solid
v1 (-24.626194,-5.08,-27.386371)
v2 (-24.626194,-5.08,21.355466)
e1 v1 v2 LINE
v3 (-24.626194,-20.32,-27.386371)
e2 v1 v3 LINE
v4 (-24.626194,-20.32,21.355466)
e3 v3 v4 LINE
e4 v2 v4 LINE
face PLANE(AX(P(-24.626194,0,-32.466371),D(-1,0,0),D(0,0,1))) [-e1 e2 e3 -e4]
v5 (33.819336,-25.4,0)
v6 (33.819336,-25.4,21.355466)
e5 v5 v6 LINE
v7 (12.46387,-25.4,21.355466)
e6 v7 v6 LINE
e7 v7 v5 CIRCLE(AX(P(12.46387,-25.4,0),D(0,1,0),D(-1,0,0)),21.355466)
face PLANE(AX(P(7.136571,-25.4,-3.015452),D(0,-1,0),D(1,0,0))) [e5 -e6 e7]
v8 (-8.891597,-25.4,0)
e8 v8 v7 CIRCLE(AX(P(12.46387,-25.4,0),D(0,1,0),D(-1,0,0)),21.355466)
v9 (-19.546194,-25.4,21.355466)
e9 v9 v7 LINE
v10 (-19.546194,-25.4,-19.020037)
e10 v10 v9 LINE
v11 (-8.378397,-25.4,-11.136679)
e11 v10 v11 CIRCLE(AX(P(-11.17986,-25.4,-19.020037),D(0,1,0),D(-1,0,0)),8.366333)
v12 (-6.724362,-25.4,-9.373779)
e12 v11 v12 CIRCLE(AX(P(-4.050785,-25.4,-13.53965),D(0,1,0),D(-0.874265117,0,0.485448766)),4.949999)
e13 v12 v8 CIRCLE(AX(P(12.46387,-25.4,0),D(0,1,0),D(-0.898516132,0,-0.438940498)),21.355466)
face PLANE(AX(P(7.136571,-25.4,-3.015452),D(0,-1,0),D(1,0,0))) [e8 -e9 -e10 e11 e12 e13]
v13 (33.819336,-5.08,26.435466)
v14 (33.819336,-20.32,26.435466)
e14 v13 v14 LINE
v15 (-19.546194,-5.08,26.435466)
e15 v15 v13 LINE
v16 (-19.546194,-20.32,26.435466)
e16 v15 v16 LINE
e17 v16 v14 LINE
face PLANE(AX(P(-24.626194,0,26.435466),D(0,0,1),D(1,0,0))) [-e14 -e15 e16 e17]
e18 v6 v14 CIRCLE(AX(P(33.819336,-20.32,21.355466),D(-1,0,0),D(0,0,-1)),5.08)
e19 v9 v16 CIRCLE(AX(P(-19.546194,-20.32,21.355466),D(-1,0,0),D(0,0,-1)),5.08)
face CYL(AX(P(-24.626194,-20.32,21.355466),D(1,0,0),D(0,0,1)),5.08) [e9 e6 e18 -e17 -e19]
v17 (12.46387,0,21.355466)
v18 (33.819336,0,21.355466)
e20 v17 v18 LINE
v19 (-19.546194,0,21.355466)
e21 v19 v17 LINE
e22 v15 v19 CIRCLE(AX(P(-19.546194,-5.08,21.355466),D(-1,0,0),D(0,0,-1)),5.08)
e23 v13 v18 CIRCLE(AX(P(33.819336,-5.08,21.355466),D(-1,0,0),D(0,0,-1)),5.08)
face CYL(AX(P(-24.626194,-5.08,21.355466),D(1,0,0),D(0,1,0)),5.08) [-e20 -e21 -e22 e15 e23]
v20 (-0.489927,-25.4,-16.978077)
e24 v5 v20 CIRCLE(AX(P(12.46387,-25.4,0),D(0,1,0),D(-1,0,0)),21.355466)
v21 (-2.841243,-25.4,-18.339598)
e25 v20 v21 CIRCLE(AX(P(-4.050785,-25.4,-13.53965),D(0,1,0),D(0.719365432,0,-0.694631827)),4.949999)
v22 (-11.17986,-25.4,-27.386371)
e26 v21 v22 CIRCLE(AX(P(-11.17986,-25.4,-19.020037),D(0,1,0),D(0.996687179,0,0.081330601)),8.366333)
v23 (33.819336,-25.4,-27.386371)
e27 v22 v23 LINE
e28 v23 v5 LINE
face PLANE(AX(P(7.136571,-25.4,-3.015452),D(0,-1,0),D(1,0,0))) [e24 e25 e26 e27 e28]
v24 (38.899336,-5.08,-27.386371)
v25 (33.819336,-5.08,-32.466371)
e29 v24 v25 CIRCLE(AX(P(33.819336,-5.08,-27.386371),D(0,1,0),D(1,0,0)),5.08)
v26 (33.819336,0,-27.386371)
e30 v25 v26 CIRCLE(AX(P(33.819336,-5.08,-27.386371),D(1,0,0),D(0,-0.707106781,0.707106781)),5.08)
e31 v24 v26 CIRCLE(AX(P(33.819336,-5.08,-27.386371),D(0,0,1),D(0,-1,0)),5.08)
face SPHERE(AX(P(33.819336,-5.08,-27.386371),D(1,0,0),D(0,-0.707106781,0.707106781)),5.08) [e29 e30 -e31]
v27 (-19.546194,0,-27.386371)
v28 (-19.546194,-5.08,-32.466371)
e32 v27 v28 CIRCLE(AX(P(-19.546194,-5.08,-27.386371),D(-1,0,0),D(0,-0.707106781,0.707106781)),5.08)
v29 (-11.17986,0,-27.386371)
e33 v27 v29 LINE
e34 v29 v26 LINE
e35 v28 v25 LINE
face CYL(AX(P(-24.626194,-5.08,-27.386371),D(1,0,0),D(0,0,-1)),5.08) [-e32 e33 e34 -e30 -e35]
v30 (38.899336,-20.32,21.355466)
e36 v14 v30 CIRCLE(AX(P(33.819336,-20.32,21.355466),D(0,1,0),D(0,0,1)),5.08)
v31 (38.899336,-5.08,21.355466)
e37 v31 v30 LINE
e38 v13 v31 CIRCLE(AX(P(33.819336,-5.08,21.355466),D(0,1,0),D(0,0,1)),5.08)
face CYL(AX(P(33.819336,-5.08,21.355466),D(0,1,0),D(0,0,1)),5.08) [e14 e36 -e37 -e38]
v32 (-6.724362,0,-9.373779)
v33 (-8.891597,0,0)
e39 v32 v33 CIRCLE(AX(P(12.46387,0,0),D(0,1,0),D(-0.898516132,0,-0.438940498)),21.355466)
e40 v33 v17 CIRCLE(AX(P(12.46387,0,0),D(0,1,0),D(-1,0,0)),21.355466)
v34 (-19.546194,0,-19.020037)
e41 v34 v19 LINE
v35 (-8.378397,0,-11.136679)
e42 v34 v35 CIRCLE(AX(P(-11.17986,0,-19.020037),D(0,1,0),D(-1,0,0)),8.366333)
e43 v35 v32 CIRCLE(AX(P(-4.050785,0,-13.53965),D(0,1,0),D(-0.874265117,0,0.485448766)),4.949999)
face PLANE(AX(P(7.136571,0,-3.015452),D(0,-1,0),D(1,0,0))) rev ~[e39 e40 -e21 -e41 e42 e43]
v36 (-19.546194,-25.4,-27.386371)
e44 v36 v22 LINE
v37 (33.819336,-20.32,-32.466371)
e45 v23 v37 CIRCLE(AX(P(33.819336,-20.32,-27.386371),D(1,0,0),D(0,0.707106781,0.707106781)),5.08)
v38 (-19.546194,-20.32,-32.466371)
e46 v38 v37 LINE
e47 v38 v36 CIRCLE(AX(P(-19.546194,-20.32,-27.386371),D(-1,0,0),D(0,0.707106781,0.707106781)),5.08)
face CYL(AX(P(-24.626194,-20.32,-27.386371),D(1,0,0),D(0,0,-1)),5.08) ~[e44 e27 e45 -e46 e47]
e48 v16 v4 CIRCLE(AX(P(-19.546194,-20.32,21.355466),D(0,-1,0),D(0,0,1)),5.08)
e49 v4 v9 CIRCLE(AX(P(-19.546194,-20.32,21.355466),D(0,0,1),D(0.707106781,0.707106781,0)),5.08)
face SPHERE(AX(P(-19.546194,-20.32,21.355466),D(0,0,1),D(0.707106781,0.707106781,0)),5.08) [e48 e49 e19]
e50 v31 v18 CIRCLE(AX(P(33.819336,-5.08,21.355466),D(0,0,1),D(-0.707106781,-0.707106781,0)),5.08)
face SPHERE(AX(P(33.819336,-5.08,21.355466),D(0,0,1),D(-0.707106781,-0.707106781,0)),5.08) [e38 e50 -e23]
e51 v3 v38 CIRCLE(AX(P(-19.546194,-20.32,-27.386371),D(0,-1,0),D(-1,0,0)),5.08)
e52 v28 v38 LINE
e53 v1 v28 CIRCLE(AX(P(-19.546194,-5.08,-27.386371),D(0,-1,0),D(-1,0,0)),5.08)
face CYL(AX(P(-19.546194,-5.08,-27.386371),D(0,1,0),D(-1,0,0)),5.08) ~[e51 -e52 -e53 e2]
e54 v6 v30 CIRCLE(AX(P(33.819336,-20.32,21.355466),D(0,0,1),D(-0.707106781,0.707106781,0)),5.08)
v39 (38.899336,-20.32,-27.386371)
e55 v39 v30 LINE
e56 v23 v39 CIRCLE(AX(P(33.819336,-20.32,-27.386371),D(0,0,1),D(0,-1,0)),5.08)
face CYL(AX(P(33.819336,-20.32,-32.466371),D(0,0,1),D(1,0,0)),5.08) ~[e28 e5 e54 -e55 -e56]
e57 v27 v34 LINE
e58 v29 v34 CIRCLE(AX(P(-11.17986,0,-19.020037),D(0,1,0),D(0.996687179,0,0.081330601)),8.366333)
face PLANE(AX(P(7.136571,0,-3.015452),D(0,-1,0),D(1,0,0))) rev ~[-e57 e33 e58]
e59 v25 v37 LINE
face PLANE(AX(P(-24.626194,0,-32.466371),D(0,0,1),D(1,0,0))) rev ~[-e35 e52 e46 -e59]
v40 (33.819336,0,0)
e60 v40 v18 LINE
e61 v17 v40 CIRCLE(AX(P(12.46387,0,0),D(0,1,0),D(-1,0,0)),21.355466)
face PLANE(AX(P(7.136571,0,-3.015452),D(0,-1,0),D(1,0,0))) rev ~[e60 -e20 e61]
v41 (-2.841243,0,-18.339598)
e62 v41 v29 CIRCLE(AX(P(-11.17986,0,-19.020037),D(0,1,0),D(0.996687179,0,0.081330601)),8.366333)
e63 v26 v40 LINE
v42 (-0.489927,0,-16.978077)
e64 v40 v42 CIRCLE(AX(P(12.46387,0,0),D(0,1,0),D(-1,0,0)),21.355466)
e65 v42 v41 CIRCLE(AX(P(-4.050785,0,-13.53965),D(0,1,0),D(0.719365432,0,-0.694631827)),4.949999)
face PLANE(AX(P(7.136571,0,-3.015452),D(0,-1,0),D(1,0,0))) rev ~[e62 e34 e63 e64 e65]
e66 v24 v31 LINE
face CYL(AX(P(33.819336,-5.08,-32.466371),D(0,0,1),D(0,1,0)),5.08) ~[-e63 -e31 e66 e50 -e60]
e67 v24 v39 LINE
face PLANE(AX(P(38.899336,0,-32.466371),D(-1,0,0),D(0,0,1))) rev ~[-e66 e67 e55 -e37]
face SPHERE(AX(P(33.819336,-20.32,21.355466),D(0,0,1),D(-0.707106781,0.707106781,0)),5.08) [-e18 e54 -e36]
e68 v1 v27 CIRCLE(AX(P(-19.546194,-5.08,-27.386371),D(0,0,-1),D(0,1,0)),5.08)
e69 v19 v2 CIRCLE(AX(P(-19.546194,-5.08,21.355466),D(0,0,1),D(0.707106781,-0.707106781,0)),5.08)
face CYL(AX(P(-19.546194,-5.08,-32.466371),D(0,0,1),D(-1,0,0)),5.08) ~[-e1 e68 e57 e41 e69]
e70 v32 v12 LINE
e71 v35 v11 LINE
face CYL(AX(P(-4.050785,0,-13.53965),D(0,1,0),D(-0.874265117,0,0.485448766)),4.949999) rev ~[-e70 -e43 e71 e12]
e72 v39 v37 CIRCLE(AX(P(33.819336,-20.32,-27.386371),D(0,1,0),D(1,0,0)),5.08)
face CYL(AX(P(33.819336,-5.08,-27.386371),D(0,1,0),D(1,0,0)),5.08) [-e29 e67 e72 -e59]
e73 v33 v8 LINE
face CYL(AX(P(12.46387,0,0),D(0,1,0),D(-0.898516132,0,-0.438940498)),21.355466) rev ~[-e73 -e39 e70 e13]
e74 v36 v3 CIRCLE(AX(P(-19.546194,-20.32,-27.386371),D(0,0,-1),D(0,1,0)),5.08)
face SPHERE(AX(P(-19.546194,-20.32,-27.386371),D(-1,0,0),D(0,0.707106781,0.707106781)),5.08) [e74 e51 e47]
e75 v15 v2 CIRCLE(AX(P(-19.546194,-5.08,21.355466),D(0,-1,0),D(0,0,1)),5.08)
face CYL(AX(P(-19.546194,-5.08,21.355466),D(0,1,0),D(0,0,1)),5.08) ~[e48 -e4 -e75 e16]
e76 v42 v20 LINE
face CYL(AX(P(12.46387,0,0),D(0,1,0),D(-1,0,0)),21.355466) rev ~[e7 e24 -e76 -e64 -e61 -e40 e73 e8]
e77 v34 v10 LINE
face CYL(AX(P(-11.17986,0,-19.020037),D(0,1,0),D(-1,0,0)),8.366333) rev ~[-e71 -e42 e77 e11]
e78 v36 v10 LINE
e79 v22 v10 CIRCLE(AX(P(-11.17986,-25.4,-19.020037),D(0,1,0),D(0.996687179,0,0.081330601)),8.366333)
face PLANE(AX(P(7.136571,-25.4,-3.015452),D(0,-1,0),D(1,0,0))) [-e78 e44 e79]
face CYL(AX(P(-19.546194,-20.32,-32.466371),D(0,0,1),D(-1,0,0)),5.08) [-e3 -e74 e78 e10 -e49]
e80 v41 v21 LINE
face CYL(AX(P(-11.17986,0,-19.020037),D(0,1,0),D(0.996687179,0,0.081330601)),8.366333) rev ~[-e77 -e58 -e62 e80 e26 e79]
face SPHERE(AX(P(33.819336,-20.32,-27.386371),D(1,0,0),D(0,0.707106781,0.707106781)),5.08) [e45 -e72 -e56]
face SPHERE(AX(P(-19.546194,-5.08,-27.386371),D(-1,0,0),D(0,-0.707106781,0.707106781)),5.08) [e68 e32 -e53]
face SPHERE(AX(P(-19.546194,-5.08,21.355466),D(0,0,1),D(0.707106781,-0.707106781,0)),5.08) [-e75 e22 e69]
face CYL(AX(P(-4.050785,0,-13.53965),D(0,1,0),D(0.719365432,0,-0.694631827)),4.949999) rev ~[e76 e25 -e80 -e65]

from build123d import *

# Parameters (mm, degrees)
F0_W         = 63.5255295783
F0_H         = 58.9018370956
F1_DEPTH     = 25.4
F2_R         = 5.08
F3_R         = 5.08
F4_T1_DEPTH  = 15.24
F4_S5_W      = 5.08
F4_S5_H      = 5.08
F4_T6_DEPTH  = 5.08
F4_S11_W     = 5.08
F4_S11_H     = 5.08
F4_T12_DEPTH = 5.08
F4_S17_W     = 5.08
F4_S17_H     = 5.08
F4_T18_DEPTH = 5.08
F4_S23_W     = 5.08
F4_S23_H     = 5.08
F4_T24_DEPTH = 5.08
F4_S29_W     = 5.08
F4_S29_H     = 5.08
F4_T30_DEPTH = 5.08
F4_S35_W     = 5.08
F4_S35_H     = 5.08
F4_T36_DEPTH = 5.08
F4_S41_W     = 5.08
F4_S41_H     = 5.08
F4_T42_DEPTH = 5.08
F4_S47_W     = 5.08
F4_S47_H     = 5.08
F4_T48_DEPTH = 5.08
F6_DEPTH     = 25.401


# Not quite as in the source:
# - a fillet or chamfer that OpenCascade refuses, or shapes differently, is made with other operations: its cross-section is extruded or revolved along the edge and cut away or added


with BuildPart() as f1:
    # F0 (on Front) → F1 (new body)
    with BuildSketch(Plane.XZ):
        with Locations((7.1365712211, -3.0154520646)):
            Rectangle(F0_W, F0_H)
    extrude(amount=F1_DEPTH)

    # F2
    f2_edges = [f1.edges().sort_by_distance(p)[0] for p in [
        (7.136571, -25.4, 26.435466),
        (-24.626194, -25.4, -3.015452),
        (7.136571, -25.4, -32.466371),
        (38.899336, -25.4, -3.015452),
    ]]
    fillet(f2_edges, radius=F2_R)

    # F3
    f3_edges = [f1.edges().sort_by_distance(p)[0] for p in [
        (7.136571, 0, 26.435466),
        (38.899336, 0, -3.015452),
        (-24.626194, 0, -3.015452),
        (7.136571, 0, -32.466371),
    ]]
    fillet(f3_edges, radius=F3_R)

    # F4: fillet of radius 5.08 on 4 edges, made by hand

    # F4_s2 → F4_t1 (cut)
    with BuildSketch(Plane.XZ.offset(5.08)):
        with BuildLine():
            ThreePointArc((33.8193360102, 26.4354664832), (37.4114384586, 24.9475689317), (38.8993360102, 21.3554664832))
            Line((38.8993360102, 21.3554664832), (38.8993360102, 26.4354664832))
            Line((38.8993360102, 26.4354664832), (33.8193360102, 26.4354664832))
        make_face()
        with BuildLine():
            ThreePointArc((38.8993360102, -27.3863706124), (37.4114384586, -30.9784730608), (33.8193360102, -32.4663706124))
            Line((33.8193360102, -32.4663706124), (38.8993360102, -32.4663706124))
            Line((38.8993360102, -32.4663706124), (38.8993360102, -27.3863706124))
        make_face()
        with BuildLine():
            ThreePointArc((-19.5461935681, 26.4354664832), (-23.1382960165, 24.9475689317), (-24.6261935681, 21.3554664832))
            Line((-24.6261935681, 21.3554664832), (-24.6261935681, 26.4354664832))
            Line((-24.6261935681, 26.4354664832), (-19.5461935681, 26.4354664832))
        make_face()
        with BuildLine():
            ThreePointArc((-24.6261935681, -27.3863706124), (-23.1382960165, -30.9784730608), (-19.5461935681, -32.4663706124))
            Line((-19.5461935681, -32.4663706124), (-24.6261935681, -32.4663706124))
            Line((-24.6261935681, -32.4663706124), (-24.6261935681, -27.3863706124))
        make_face()
    extrude(amount=F4_T1_DEPTH, mode=Mode.SUBTRACT)


with BuildPart() as f4_tool4:
    # F4_s5 → F4_t6 (new body)
    with BuildSketch(Plane.YZ.offset(-19.5461935681)):
        with Locations((-2.54, -29.9263706124)):
            Rectangle(F4_S5_W, F4_S5_H)
    extrude(amount=-F4_T6_DEPTH)

    # F4_s7 → F4_t8 (revolve, cut)
    with BuildSketch(Plane(origin=(-19.5461935681, -5.08, -27.3863706124), x_dir=(0, -0.7071067812, 0.7071067812), z_dir=(0, -0.7071067812, -0.7071067812))):
        with BuildLine():
            ThreePointArc((0, -5.08), (5.08, 0), (0, 5.08))
            Line((0, 5.08), (0, -5.08))
        make_face()
    revolve(axis=Axis((-19.5461935681, -5.08, -27.3863706124), (-1, 0, 0)), mode=Mode.SUBTRACT)


with BuildPart() as f1_1:
    add(f1.part)

    # F4_t3: cut F4_tool4
    add(f4_tool4.part, mode=Mode.SUBTRACT)


with BuildPart() as f4_tool10:
    # F4_s11 → F4_t12 (new body)
    with BuildSketch(Plane.YZ.offset(-19.5461935681)):
        with Locations((-22.86, -29.9263706124)):
            Rectangle(F4_S11_W, F4_S11_H)
    extrude(amount=-F4_T12_DEPTH)

    # F4_s13 → F4_t14 (revolve, cut)
    with BuildSketch(Plane(origin=(-19.5461935681, -20.32, -27.3863706124), x_dir=(0, 0.7071067812, 0.7071067812), z_dir=(0, -0.7071067812, 0.7071067812))):
        with BuildLine():
            ThreePointArc((0, -5.08), (5.08, 0), (0, 5.08))
            Line((0, 5.08), (0, -5.08))
        make_face()
    revolve(axis=Axis((-19.5461935681, -20.32, -27.3863706124), (-1, 0, 0)), mode=Mode.SUBTRACT)


with BuildPart() as f1_2:
    add(f1_1.part)

    # F4_t9: cut F4_tool10
    add(f4_tool10.part, mode=Mode.SUBTRACT)


with BuildPart() as f4_tool16:
    # F4_s17 → F4_t18 (new body)
    with BuildSketch(Plane.XY.offset(21.3554664832)):
        with Locations((-22.0861935681, -2.54)):
            Rectangle(F4_S17_W, F4_S17_H)
    extrude(amount=F4_T18_DEPTH)

    # F4_s19 → F4_t20 (revolve, cut)
    with BuildSketch(Plane(origin=(-19.5461935681, -5.08, 21.3554664832), x_dir=(0.7071067812, -0.7071067812, 0), z_dir=(-0.7071067812, -0.7071067812, 0))):
        with BuildLine():
            ThreePointArc((0, -5.08), (5.08, 0), (0, 5.08))
            Line((0, 5.08), (0, -5.08))
        make_face()
    revolve(axis=Axis((-19.5461935681, -5.08, 21.3554664832), (0, 0, 1)), mode=Mode.SUBTRACT)


with BuildPart() as f1_3:
    add(f1_2.part)

    # F4_t15: cut F4_tool16
    add(f4_tool16.part, mode=Mode.SUBTRACT)


with BuildPart() as f4_tool22:
    # F4_s23 → F4_t24 (new body)
    with BuildSketch(Plane.XY.offset(21.3554664832)):
        with Locations((-22.0861935681, -22.86)):
            Rectangle(F4_S23_W, F4_S23_H)
    extrude(amount=F4_T24_DEPTH)

    # F4_s25 → F4_t26 (revolve, cut)
    with BuildSketch(Plane(origin=(-19.5461935681, -20.32, 21.3554664832), x_dir=(0.7071067812, 0.7071067812, 0), z_dir=(0.7071067812, -0.7071067812, 0))):
        with BuildLine():
            ThreePointArc((0, -5.08), (5.08, 0), (0, 5.08))
            Line((0, 5.08), (0, -5.08))
        make_face()
    revolve(axis=Axis((-19.5461935681, -20.32, 21.3554664832), (0, 0, 1)), mode=Mode.SUBTRACT)


with BuildPart() as f1_4:
    add(f1_3.part)

    # F4_t21: cut F4_tool22
    add(f4_tool22.part, mode=Mode.SUBTRACT)


with BuildPart() as f4_tool28:
    # F4_s29 → F4_t30 (new body)
    with BuildSketch(Plane.YZ.offset(33.8193360102)):
        with Locations((-2.54, -29.9263706124)):
            Rectangle(F4_S29_W, F4_S29_H)
    extrude(amount=F4_T30_DEPTH)

    # F4_s31 → F4_t32 (revolve, cut)
    with BuildSketch(Plane(origin=(33.8193360102, -5.08, -27.3863706124), x_dir=(0, -0.7071067812, 0.7071067812), z_dir=(0, 0.7071067812, 0.7071067812))):
        with BuildLine():
            ThreePointArc((0, -5.08), (5.08, 0), (0, 5.08))
            Line((0, 5.08), (0, -5.08))
        make_face()
    revolve(axis=Axis((33.8193360102, -5.08, -27.3863706124), (1, 0, 0)), mode=Mode.SUBTRACT)


with BuildPart() as f1_5:
    add(f1_4.part)

    # F4_t27: cut F4_tool28
    add(f4_tool28.part, mode=Mode.SUBTRACT)


with BuildPart() as f4_tool34:
    # F4_s35 → F4_t36 (new body)
    with BuildSketch(Plane.YZ.offset(33.8193360102)):
        with Locations((-22.86, -29.9263706124)):
            Rectangle(F4_S35_W, F4_S35_H)
    extrude(amount=F4_T36_DEPTH)

    # F4_s37 → F4_t38 (revolve, cut)
    with BuildSketch(Plane(origin=(33.8193360102, -20.32, -27.3863706124), x_dir=(0, 0.7071067812, 0.7071067812), z_dir=(0, 0.7071067812, -0.7071067812))):
        with BuildLine():
            ThreePointArc((0, -5.08), (5.08, 0), (0, 5.08))
            Line((0, 5.08), (0, -5.08))
        make_face()
    revolve(axis=Axis((33.8193360102, -20.32, -27.3863706124), (1, 0, 0)), mode=Mode.SUBTRACT)


with BuildPart() as f1_6:
    add(f1_5.part)

    # F4_t33: cut F4_tool34
    add(f4_tool34.part, mode=Mode.SUBTRACT)


with BuildPart() as f4_tool40:
    # F4_s41 → F4_t42 (new body)
    with BuildSketch(Plane.XY.offset(21.3554664832)):
        with Locations((36.3593360102, -2.54)):
            Rectangle(F4_S41_W, F4_S41_H)
    extrude(amount=F4_T42_DEPTH)

    # F4_s43 → F4_t44 (revolve, cut)
    with BuildSketch(Plane(origin=(33.8193360102, -5.08, 21.3554664832), x_dir=(-0.7071067812, -0.7071067812, 0), z_dir=(-0.7071067812, 0.7071067812, 0))):
        with BuildLine():
            ThreePointArc((0, -5.08), (5.08, 0), (0, 5.08))
            Line((0, 5.08), (0, -5.08))
        make_face()
    revolve(axis=Axis((33.8193360102, -5.08, 21.3554664832), (0, 0, 1)), mode=Mode.SUBTRACT)


with BuildPart() as f1_7:
    add(f1_6.part)

    # F4_t39: cut F4_tool40
    add(f4_tool40.part, mode=Mode.SUBTRACT)


with BuildPart() as f4_tool46:
    # F4_s47 → F4_t48 (new body)
    with BuildSketch(Plane.XY.offset(21.3554664832)):
        with Locations((36.3593360102, -22.86)):
            Rectangle(F4_S47_W, F4_S47_H)
    extrude(amount=F4_T48_DEPTH)

    # F4_s49 → F4_t50 (revolve, cut)
    with BuildSketch(Plane(origin=(33.8193360102, -20.32, 21.3554664832), x_dir=(-0.7071067812, 0.7071067812, 0), z_dir=(0.7071067812, 0.7071067812, 0))):
        with BuildLine():
            ThreePointArc((0, -5.08), (5.08, 0), (0, 5.08))
            Line((0, 5.08), (0, -5.08))
        make_face()
    revolve(axis=Axis((33.8193360102, -20.32, 21.3554664832), (0, 0, 1)), mode=Mode.SUBTRACT)


with BuildPart() as f1_8:
    add(f1_7.part)

    # F4_t45: cut F4_tool46
    add(f4_tool46.part, mode=Mode.SUBTRACT)

    # F5 (on face) → F6 (cut, through all)
    with BuildSketch(Plane(origin=(0, 0, 0), x_dir=(-1, 0, 0), z_dir=(0, 1, 0))):
        with BuildLine():
            ThreePointArc((6.7243616166, -9.373779083), (8.3427349026, -4.8105260449), (8.8915969563, 0))
            ThreePointArc((8.8915969563, 0), (-31.6040146397, 9.4715782097), (0.4899266998, -16.978077395))
            ThreePointArc((0.4899266998, -16.978077395), (0.2228411144, -10.4012847151), (6.7243616166, -9.373779083))
        make_face()
        with BuildLine():
            ThreePointArc((6.7243616166, -9.373779083), (0.2228411144, -10.4012847151), (0.4899266998, -16.978077395))
            ThreePointArc((0.4899266998, -16.978077395), (4.0507851492, -13.5396502777), (6.7243616166, -9.373779083))
        make_face()
        with BuildLine():
            ThreePointArc((6.7243616166, -9.373779083), (4.0507851492, -13.5396502777), (0.4899266998, -16.978077395))
            ThreePointArc((0.4899266998, -16.978077395), (1.5703386286, -17.823326152), (2.8412431673, -18.3395984162))
            ThreePointArc((2.8412431673, -18.3395984162), (4.5469228112, -13.9210498797), (8.3783969439, -11.136679181))
            ThreePointArc((8.3783969439, -11.136679181), (7.6606485066, -10.152707633), (6.7243616166, -9.373779083))
        make_face()
        with BuildLine():
            ThreePointArc((9.0007845368, -13.5396502777), (7.0934206735, -17.4441173353), (2.8412431673, -18.3395984162))
            ThreePointArc((2.8412431673, -18.3395984162), (10.8393587072, -27.3794387001), (19.5461935681, -19.0200373308))
            ThreePointArc((19.5461935681, -19.0200373308), (16.0046689137, -12.1850717648), (8.3783969439, -11.136679181))
            ThreePointArc((8.3783969439, -11.136679181), (8.842662113, -12.2985180922), (9.0007845368, -13.5396502777))
        make_face()
        with BuildLine():
            ThreePointArc((8.3783969439, -11.136679181), (4.5469228112, -13.9210498797), (2.8412431673, -18.3395984162))
            ThreePointArc((2.8412431673, -18.3395984162), (7.0934206735, -17.4441173353), (9.0007845368, -13.5396502777))
            ThreePointArc((9.0007845368, -13.5396502777), (8.842662113, -12.2985180922), (8.3783969439, -11.136679181))
        make_face()
    extrude(amount=-F6_DEPTH, mode=Mode.SUBTRACT)


solid = f1_8.part
